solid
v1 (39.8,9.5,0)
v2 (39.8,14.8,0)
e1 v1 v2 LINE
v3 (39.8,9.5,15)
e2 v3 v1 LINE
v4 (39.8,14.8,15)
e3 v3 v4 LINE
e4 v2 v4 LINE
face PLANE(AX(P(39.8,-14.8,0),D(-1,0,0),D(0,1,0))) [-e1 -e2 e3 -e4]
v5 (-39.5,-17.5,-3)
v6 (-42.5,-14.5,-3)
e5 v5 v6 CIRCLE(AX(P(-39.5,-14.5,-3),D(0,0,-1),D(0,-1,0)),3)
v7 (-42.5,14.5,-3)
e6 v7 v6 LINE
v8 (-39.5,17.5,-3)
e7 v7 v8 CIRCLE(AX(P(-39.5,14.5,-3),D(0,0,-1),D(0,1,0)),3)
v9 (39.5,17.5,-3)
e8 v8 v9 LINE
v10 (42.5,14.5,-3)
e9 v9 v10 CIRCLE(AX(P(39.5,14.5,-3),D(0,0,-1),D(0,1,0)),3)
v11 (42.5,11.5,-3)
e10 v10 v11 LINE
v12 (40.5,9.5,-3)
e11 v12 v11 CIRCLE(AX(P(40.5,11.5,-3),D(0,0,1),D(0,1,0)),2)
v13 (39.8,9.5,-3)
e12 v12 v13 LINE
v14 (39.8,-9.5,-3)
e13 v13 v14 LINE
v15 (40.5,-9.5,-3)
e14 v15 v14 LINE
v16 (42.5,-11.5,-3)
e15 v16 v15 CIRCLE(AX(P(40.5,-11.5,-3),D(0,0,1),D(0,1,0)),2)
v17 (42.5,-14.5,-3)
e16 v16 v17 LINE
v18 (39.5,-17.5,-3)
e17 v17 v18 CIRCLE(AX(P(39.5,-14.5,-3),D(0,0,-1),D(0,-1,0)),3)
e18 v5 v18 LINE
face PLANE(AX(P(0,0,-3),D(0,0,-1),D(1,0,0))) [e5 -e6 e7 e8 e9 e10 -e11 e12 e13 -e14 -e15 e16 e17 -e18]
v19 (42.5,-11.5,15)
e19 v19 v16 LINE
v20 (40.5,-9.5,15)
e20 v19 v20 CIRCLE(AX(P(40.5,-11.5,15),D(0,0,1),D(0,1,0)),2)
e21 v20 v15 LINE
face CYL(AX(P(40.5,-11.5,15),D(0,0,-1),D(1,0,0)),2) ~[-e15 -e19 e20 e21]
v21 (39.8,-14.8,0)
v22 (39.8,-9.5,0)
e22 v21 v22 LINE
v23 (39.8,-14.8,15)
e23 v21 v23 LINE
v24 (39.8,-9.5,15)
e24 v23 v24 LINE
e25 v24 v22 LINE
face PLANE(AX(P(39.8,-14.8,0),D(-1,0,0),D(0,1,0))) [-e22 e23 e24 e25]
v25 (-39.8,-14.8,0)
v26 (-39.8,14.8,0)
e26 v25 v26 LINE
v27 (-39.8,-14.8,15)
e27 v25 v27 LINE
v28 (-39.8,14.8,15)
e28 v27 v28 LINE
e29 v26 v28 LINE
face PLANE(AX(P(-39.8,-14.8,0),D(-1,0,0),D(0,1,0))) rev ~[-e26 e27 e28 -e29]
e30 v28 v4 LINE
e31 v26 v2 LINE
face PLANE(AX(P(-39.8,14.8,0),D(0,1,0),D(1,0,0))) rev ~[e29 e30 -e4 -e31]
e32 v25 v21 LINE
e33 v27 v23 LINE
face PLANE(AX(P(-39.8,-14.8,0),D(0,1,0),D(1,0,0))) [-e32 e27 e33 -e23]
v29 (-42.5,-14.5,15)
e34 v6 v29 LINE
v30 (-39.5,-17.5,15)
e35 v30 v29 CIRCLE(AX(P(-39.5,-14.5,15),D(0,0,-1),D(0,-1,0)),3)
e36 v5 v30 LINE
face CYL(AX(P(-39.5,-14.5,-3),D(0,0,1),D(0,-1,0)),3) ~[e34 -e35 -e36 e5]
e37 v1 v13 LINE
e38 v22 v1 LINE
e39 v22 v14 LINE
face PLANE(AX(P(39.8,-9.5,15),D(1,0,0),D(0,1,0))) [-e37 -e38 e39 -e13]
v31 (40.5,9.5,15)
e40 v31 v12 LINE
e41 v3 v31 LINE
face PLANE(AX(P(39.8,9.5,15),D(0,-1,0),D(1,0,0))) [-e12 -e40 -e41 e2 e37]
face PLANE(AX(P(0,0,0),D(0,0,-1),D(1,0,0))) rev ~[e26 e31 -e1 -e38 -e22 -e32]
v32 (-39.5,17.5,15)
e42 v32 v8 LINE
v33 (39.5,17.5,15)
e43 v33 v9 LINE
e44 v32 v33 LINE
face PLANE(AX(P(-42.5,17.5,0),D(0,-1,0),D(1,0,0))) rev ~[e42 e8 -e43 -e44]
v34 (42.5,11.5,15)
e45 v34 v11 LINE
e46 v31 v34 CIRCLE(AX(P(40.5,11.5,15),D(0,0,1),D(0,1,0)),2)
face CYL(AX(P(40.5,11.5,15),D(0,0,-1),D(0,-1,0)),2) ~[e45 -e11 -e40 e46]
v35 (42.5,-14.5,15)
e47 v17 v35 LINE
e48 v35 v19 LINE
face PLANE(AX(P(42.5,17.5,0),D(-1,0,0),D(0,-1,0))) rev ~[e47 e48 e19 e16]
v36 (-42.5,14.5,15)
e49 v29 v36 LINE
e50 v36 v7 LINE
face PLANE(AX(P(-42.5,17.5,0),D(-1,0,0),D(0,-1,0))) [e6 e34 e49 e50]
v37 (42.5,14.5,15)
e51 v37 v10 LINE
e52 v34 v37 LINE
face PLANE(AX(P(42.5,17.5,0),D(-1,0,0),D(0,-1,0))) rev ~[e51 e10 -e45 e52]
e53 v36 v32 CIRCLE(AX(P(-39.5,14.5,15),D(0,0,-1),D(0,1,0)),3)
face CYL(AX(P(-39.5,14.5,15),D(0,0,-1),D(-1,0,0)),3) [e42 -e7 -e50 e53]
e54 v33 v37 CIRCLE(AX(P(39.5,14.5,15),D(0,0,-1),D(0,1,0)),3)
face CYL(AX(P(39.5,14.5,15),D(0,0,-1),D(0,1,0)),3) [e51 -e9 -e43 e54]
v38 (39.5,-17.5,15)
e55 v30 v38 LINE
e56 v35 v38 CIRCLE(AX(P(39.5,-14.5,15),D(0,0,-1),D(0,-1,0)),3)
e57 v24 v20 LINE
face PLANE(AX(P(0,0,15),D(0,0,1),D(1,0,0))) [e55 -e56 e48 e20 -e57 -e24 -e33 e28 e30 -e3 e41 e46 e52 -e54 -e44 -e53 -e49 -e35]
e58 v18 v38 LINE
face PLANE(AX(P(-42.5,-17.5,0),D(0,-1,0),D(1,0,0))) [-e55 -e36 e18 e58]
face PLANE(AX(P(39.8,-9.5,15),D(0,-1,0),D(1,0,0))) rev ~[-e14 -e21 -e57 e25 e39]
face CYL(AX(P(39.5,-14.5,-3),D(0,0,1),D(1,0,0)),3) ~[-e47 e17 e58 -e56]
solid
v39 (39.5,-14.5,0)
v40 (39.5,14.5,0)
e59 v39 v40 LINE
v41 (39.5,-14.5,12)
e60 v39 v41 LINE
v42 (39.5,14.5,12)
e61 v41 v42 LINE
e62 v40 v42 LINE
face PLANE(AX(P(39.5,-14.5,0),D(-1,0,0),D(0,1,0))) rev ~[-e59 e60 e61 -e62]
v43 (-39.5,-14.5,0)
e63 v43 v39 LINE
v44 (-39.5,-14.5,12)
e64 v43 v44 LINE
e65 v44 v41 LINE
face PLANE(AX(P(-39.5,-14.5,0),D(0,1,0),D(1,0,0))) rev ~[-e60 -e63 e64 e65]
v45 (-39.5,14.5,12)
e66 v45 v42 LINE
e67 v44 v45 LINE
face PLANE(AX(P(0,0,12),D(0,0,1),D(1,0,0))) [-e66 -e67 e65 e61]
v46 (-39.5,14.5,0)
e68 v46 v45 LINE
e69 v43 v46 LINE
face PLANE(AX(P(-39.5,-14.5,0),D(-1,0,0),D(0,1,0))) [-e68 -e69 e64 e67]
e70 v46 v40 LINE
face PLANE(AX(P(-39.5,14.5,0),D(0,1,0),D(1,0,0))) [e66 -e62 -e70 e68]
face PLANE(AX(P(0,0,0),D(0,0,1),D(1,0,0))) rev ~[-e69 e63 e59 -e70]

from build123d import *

# Parameters (mm, degrees)
F0_W     = 79
F0_H     = 29
F1_DEPTH = 12
F2_W     = 85
F2_H     = 35
F2_W_2   = 79.6
F2_H_2   = 29.6
F3_DEPTH = 15
F4_W     = 85
F4_H     = 35
F5_DEPTH = 3
F6_W     = 2.7
F6_H     = 19
F7_DEPTH = 25
F8_R     = 2
F9_R     = 3


with BuildPart() as f1:
    # F0 (on Top) → F1 (new body)
    with BuildSketch(Plane.XY):
        Rectangle(F0_W, F0_H)
    extrude(amount=F1_DEPTH)


with BuildPart() as f3:
    # F2 (on Top) → F3 (new body)
    with BuildSketch(Plane.XY):
        Rectangle(F2_W, F2_H)
        Rectangle(F2_W_2, F2_H_2, mode=Mode.SUBTRACT)
    extrude(amount=F3_DEPTH)

    # F4 (on face) → F5 (join)
    with BuildSketch(Plane(origin=(0, 0, 0), x_dir=(1, 0, 0), z_dir=(0, 0, -1))):
        Rectangle(F4_W, F4_H)
    extrude(amount=F5_DEPTH)

    # F6 (on face) → F7 (cut)
    with BuildSketch(Plane.XY.offset(15)):
        with Locations((41.15, 0)):
            Rectangle(F6_W, F6_H)
    extrude(amount=-F7_DEPTH, mode=Mode.SUBTRACT)

    # F8
    f8_edges = [f3.edges().sort_by_distance(p)[0] for p in [
        (42.5, -9.5, 6),
        (42.5, 9.5, 6),
    ]]
    fillet(f8_edges, radius=F8_R)

    # F9
    f9_edges = [f3.edges().sort_by_distance(p)[0] for p in [
        (42.5, -17.5, 6),
        (-42.5, -17.5, 6),
        (-42.5, 17.5, 6),
        (42.5, 17.5, 6),
    ]]
    fillet(f9_edges, radius=F9_R)


solid = Compound([f1.part, f3.part])
